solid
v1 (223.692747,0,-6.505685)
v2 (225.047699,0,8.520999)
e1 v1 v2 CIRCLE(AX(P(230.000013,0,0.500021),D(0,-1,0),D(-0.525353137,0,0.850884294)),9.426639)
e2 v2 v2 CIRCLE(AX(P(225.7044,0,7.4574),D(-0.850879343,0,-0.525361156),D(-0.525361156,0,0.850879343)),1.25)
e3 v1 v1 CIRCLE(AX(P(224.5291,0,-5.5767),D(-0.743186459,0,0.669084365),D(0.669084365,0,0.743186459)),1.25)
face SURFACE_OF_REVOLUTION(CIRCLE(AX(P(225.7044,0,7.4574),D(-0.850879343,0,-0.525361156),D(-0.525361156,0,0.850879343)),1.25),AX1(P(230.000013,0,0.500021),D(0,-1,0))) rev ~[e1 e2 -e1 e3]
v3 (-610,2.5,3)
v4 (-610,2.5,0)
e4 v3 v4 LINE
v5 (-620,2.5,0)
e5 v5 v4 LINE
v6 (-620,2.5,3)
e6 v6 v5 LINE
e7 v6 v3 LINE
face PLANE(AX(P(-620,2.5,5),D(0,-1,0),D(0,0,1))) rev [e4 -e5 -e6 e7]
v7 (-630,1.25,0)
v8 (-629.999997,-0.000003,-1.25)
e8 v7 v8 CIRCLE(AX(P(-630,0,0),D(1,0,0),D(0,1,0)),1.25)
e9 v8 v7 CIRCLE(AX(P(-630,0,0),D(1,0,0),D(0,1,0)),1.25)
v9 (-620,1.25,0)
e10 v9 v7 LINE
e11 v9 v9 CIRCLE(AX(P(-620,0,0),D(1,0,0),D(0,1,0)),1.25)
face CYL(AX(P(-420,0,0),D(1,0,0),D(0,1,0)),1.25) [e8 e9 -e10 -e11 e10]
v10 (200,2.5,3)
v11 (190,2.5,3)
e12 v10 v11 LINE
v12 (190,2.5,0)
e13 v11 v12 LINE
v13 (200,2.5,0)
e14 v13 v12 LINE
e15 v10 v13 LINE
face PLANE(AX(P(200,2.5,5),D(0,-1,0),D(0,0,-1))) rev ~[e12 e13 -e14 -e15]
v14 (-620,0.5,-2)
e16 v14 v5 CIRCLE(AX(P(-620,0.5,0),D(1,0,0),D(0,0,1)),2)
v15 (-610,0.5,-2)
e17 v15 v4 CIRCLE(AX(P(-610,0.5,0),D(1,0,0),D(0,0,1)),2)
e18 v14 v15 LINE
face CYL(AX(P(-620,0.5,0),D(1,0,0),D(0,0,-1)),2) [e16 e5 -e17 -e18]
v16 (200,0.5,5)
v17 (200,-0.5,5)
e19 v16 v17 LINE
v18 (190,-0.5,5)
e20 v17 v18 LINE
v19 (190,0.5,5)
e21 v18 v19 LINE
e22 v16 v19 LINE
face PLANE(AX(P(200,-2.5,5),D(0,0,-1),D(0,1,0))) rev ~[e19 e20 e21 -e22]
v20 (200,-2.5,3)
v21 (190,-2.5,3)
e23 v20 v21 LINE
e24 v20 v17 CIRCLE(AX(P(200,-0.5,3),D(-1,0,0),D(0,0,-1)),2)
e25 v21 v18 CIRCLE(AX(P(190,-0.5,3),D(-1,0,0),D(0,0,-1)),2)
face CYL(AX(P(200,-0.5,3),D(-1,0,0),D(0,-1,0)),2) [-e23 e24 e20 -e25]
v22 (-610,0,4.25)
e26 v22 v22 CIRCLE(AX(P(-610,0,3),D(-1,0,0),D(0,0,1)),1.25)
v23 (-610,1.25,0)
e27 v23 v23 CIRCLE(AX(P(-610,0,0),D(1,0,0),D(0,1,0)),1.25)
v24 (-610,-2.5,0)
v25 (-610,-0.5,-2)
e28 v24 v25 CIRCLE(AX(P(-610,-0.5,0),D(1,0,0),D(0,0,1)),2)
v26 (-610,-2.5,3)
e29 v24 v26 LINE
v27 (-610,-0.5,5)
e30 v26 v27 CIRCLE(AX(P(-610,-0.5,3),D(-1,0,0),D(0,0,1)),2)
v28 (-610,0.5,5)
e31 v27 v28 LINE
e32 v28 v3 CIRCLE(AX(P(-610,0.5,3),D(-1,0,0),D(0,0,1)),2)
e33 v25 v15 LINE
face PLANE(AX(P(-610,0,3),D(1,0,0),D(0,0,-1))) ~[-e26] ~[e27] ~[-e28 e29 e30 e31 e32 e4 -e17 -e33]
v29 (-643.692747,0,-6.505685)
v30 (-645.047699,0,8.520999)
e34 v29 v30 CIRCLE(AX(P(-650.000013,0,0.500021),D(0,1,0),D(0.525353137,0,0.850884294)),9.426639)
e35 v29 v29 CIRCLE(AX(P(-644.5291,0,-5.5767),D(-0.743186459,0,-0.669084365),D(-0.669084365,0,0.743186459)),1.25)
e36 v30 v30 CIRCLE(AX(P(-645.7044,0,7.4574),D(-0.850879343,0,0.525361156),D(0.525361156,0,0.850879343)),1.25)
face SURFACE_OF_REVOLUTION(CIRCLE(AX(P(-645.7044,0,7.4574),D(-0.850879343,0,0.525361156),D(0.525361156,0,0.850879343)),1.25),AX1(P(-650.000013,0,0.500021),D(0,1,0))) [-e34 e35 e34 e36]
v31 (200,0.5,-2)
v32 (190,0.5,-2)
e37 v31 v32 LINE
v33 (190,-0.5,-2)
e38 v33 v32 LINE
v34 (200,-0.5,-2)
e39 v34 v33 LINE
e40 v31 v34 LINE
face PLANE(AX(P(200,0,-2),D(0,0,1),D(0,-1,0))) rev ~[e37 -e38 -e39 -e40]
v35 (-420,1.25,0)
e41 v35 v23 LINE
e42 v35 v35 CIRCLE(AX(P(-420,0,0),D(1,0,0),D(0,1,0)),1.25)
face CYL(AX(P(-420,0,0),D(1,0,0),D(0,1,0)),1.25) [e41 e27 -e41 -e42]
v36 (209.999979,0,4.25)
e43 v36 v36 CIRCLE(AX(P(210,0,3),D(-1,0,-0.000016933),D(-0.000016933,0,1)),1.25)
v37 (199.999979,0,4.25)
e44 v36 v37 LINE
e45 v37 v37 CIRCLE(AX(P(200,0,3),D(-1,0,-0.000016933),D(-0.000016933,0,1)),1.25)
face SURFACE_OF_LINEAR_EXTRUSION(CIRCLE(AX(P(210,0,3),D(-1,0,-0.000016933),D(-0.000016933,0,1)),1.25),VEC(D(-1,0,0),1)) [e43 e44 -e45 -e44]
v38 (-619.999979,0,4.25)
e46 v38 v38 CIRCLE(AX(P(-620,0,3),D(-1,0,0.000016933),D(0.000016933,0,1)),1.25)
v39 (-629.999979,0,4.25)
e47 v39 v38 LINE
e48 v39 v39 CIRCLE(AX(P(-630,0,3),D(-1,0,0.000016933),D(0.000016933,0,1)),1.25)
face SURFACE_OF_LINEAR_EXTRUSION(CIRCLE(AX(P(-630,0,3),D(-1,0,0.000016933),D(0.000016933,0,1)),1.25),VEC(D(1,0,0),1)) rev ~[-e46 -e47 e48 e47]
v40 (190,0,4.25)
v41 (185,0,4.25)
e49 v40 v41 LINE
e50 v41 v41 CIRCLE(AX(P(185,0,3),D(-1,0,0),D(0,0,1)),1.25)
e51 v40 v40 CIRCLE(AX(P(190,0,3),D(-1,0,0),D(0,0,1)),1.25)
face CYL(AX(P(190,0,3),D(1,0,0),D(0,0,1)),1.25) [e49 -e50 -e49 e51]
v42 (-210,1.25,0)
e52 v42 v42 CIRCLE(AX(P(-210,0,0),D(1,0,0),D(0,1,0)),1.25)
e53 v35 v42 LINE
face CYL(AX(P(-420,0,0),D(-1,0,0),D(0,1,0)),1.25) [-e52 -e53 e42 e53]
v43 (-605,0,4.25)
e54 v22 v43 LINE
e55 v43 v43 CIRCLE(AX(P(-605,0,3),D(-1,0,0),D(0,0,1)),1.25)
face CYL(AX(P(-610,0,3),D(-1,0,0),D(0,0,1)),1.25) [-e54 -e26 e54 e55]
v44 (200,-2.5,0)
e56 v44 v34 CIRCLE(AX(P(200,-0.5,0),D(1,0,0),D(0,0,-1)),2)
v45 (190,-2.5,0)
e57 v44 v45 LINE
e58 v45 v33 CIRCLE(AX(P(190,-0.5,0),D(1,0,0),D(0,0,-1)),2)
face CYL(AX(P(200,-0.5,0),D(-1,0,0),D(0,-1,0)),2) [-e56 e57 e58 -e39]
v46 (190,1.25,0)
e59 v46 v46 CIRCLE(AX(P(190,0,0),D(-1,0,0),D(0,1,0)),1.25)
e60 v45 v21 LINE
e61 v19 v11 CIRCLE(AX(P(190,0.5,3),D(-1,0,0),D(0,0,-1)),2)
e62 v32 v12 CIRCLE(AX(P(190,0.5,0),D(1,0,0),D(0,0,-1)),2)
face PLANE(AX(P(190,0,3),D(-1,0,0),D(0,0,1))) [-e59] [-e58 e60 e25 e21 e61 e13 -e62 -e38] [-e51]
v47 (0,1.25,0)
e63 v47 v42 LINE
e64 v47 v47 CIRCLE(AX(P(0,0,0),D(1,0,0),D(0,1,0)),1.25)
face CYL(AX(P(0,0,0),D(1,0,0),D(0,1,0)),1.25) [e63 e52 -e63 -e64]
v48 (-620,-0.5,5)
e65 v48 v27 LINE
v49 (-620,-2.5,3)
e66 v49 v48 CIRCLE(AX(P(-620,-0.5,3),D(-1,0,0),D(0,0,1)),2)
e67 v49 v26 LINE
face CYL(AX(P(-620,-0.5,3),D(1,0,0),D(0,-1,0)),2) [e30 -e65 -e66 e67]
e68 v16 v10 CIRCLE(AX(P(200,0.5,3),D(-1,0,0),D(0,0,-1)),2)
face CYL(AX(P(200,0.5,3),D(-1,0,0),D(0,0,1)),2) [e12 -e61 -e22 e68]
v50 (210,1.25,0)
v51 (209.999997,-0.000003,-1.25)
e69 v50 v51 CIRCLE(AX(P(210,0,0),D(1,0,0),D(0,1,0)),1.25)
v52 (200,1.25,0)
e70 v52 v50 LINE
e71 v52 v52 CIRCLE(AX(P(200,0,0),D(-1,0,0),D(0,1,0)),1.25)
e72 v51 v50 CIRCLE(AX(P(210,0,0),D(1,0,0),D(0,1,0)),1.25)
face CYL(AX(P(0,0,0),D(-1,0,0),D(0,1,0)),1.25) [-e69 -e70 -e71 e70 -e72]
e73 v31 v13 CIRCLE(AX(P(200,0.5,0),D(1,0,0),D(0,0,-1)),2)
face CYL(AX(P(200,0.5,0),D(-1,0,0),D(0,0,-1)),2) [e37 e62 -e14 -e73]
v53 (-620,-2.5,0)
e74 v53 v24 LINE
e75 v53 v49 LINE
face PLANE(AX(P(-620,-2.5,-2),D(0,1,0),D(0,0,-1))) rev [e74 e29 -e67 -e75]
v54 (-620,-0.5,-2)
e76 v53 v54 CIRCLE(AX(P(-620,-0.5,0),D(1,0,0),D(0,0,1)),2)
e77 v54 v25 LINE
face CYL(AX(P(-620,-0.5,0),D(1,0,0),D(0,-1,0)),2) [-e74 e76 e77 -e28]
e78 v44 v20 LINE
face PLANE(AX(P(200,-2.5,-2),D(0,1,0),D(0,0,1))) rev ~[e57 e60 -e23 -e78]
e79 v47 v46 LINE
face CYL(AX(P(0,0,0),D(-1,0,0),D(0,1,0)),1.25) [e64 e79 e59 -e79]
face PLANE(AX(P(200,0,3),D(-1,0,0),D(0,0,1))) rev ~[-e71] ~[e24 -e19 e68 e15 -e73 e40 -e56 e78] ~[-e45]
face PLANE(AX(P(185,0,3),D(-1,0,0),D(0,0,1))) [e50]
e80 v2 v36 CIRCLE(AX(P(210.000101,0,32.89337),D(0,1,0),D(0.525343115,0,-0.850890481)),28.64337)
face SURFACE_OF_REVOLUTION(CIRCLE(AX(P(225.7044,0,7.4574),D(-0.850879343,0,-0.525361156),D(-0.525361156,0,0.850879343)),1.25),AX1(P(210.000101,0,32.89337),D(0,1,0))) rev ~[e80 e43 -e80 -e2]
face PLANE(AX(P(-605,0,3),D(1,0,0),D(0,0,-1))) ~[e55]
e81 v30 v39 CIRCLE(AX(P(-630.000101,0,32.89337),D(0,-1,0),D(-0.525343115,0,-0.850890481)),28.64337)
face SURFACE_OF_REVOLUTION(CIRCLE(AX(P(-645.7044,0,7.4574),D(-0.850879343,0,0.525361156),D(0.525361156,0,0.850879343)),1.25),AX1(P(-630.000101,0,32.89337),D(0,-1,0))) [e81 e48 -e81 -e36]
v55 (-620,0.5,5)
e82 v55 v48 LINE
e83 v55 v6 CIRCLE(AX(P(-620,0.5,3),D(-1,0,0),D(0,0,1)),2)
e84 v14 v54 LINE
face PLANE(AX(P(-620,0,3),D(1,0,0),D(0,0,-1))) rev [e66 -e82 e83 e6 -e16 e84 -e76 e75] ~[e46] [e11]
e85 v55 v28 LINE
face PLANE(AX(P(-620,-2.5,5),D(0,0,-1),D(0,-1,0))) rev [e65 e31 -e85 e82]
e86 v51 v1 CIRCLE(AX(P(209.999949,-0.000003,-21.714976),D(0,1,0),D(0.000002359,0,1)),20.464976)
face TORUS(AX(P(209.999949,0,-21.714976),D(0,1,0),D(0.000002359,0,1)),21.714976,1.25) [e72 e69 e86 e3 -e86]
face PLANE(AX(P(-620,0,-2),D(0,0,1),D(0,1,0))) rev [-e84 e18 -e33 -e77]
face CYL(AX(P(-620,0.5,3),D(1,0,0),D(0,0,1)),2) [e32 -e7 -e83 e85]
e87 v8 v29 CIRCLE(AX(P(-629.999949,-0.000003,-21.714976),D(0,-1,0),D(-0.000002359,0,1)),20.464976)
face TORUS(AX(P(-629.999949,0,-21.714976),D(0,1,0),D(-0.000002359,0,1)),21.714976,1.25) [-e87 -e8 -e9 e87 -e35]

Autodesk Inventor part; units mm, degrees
ref_plane "YZ Plane" through (0, 0, 0) normal (1, 0, 0) x (0, 1, 0)
ref_plane "XZ Plane" through (0, 0, 0) normal (0, 1, 0) x (-1, 0, 0)
ref_plane "XY Plane" through (0, 0, 0) normal (0, 0, 1) x (1, 0, 0)
sketch "スケッチ1" plane through (0, 0, 0) normal (1, 0, 0) x (0, 1, 0)
  circle A0 centre (0, 0) radius 1.25
  dimension "d0" = 2.5
extrude "押し出し1" add sketch "スケッチ1" along normal mid plane 420
sketch "スケッチ2" plane through (210, 0, 0) normal (1, 0, 0) x (0, 0, -1)
  circle A0 centre (0, 0) radius 1.25 projected
sketch "スケッチ3" plane through (0, 0, 0) normal (0, 1, 0) x (-1, 0, 0)
  line L0 (-210, 1.25) -> (-210, -1.25) projected
  arc A0 (-210, 0) -> (-224.5291, -5.5767) centre (-210, -21.7147) ccw
  arc A1 (-225.7044, 7.4574) -> (-224.5291, -5.5767) centre (-230, 0.5) ccw
  arc A2 (-225.7044, 7.4574) -> (-210, 3) centre (-210, 32.8936) ccw
  line L1 (-210, 3) -> (-200, 3)
  point P0 (0, 0)
  dimension "d3" = 3
  dimension "d4" = 20
  dimension "d5" = 2.5
  dimension "d8" = 10
sweep "スイープ1" add profiles "スケッチ2" path "スケッチ3" path curves A0 A1 A2 L1
sketch "スケッチ4" plane through (200, 0, 3) normal (-1, 0, 0) x (0, 0, 1)
  line L0 (-5, -2.5) -> (2, -2.5)
  line L1 (2, -2.5) -> (2, 2.5)
  line L2 (2, 2.5) -> (-5, 2.5)
  line L3 (-5, 2.5) -> (-5, -2.5)
  line L4 (-5, -2.5) -> (2, 2.5) construction
  line L5 (2, -2.5) -> (-5, 2.5) construction
  circle A0 centre (0, 0) radius 1.25 projected
  line L6 (-15.6973, 0) -> (10.6973, 0) projected
  point P0 (-3, 0)
  point P1 (-1.5, 0)
  point P2 (-1.5, 0)
  dimension "d9" = 1.5
  dimension "d10" = 7
  dimension "d11" = 5
extrude "押し出し2" add sketch "スケッチ4" along normal blind 10
fillet "フィレット1" radius 2 4 edges at (195, 2.5, -2) (195, -2.5, -2) (195, -2.5, 5) (195, 2.5, 5)
sketch "スケッチ5" plane through (190, 0, 3) normal (-1, 0, 0) x (0, 0, 1)
  circle A0 centre (0, 0) radius 1.25 projected
  point P0 (-3, 0)
extrude "押し出し3" add sketch "スケッチ5" along normal blind 5
mirror "ミラー1" about plane through (-210, 0, 0) normal (-1, 0, 0) of "押し出し1", "スイープ1", "押し出し2", "フィレット1", "押し出し3"
properties part number "wire zumen"
